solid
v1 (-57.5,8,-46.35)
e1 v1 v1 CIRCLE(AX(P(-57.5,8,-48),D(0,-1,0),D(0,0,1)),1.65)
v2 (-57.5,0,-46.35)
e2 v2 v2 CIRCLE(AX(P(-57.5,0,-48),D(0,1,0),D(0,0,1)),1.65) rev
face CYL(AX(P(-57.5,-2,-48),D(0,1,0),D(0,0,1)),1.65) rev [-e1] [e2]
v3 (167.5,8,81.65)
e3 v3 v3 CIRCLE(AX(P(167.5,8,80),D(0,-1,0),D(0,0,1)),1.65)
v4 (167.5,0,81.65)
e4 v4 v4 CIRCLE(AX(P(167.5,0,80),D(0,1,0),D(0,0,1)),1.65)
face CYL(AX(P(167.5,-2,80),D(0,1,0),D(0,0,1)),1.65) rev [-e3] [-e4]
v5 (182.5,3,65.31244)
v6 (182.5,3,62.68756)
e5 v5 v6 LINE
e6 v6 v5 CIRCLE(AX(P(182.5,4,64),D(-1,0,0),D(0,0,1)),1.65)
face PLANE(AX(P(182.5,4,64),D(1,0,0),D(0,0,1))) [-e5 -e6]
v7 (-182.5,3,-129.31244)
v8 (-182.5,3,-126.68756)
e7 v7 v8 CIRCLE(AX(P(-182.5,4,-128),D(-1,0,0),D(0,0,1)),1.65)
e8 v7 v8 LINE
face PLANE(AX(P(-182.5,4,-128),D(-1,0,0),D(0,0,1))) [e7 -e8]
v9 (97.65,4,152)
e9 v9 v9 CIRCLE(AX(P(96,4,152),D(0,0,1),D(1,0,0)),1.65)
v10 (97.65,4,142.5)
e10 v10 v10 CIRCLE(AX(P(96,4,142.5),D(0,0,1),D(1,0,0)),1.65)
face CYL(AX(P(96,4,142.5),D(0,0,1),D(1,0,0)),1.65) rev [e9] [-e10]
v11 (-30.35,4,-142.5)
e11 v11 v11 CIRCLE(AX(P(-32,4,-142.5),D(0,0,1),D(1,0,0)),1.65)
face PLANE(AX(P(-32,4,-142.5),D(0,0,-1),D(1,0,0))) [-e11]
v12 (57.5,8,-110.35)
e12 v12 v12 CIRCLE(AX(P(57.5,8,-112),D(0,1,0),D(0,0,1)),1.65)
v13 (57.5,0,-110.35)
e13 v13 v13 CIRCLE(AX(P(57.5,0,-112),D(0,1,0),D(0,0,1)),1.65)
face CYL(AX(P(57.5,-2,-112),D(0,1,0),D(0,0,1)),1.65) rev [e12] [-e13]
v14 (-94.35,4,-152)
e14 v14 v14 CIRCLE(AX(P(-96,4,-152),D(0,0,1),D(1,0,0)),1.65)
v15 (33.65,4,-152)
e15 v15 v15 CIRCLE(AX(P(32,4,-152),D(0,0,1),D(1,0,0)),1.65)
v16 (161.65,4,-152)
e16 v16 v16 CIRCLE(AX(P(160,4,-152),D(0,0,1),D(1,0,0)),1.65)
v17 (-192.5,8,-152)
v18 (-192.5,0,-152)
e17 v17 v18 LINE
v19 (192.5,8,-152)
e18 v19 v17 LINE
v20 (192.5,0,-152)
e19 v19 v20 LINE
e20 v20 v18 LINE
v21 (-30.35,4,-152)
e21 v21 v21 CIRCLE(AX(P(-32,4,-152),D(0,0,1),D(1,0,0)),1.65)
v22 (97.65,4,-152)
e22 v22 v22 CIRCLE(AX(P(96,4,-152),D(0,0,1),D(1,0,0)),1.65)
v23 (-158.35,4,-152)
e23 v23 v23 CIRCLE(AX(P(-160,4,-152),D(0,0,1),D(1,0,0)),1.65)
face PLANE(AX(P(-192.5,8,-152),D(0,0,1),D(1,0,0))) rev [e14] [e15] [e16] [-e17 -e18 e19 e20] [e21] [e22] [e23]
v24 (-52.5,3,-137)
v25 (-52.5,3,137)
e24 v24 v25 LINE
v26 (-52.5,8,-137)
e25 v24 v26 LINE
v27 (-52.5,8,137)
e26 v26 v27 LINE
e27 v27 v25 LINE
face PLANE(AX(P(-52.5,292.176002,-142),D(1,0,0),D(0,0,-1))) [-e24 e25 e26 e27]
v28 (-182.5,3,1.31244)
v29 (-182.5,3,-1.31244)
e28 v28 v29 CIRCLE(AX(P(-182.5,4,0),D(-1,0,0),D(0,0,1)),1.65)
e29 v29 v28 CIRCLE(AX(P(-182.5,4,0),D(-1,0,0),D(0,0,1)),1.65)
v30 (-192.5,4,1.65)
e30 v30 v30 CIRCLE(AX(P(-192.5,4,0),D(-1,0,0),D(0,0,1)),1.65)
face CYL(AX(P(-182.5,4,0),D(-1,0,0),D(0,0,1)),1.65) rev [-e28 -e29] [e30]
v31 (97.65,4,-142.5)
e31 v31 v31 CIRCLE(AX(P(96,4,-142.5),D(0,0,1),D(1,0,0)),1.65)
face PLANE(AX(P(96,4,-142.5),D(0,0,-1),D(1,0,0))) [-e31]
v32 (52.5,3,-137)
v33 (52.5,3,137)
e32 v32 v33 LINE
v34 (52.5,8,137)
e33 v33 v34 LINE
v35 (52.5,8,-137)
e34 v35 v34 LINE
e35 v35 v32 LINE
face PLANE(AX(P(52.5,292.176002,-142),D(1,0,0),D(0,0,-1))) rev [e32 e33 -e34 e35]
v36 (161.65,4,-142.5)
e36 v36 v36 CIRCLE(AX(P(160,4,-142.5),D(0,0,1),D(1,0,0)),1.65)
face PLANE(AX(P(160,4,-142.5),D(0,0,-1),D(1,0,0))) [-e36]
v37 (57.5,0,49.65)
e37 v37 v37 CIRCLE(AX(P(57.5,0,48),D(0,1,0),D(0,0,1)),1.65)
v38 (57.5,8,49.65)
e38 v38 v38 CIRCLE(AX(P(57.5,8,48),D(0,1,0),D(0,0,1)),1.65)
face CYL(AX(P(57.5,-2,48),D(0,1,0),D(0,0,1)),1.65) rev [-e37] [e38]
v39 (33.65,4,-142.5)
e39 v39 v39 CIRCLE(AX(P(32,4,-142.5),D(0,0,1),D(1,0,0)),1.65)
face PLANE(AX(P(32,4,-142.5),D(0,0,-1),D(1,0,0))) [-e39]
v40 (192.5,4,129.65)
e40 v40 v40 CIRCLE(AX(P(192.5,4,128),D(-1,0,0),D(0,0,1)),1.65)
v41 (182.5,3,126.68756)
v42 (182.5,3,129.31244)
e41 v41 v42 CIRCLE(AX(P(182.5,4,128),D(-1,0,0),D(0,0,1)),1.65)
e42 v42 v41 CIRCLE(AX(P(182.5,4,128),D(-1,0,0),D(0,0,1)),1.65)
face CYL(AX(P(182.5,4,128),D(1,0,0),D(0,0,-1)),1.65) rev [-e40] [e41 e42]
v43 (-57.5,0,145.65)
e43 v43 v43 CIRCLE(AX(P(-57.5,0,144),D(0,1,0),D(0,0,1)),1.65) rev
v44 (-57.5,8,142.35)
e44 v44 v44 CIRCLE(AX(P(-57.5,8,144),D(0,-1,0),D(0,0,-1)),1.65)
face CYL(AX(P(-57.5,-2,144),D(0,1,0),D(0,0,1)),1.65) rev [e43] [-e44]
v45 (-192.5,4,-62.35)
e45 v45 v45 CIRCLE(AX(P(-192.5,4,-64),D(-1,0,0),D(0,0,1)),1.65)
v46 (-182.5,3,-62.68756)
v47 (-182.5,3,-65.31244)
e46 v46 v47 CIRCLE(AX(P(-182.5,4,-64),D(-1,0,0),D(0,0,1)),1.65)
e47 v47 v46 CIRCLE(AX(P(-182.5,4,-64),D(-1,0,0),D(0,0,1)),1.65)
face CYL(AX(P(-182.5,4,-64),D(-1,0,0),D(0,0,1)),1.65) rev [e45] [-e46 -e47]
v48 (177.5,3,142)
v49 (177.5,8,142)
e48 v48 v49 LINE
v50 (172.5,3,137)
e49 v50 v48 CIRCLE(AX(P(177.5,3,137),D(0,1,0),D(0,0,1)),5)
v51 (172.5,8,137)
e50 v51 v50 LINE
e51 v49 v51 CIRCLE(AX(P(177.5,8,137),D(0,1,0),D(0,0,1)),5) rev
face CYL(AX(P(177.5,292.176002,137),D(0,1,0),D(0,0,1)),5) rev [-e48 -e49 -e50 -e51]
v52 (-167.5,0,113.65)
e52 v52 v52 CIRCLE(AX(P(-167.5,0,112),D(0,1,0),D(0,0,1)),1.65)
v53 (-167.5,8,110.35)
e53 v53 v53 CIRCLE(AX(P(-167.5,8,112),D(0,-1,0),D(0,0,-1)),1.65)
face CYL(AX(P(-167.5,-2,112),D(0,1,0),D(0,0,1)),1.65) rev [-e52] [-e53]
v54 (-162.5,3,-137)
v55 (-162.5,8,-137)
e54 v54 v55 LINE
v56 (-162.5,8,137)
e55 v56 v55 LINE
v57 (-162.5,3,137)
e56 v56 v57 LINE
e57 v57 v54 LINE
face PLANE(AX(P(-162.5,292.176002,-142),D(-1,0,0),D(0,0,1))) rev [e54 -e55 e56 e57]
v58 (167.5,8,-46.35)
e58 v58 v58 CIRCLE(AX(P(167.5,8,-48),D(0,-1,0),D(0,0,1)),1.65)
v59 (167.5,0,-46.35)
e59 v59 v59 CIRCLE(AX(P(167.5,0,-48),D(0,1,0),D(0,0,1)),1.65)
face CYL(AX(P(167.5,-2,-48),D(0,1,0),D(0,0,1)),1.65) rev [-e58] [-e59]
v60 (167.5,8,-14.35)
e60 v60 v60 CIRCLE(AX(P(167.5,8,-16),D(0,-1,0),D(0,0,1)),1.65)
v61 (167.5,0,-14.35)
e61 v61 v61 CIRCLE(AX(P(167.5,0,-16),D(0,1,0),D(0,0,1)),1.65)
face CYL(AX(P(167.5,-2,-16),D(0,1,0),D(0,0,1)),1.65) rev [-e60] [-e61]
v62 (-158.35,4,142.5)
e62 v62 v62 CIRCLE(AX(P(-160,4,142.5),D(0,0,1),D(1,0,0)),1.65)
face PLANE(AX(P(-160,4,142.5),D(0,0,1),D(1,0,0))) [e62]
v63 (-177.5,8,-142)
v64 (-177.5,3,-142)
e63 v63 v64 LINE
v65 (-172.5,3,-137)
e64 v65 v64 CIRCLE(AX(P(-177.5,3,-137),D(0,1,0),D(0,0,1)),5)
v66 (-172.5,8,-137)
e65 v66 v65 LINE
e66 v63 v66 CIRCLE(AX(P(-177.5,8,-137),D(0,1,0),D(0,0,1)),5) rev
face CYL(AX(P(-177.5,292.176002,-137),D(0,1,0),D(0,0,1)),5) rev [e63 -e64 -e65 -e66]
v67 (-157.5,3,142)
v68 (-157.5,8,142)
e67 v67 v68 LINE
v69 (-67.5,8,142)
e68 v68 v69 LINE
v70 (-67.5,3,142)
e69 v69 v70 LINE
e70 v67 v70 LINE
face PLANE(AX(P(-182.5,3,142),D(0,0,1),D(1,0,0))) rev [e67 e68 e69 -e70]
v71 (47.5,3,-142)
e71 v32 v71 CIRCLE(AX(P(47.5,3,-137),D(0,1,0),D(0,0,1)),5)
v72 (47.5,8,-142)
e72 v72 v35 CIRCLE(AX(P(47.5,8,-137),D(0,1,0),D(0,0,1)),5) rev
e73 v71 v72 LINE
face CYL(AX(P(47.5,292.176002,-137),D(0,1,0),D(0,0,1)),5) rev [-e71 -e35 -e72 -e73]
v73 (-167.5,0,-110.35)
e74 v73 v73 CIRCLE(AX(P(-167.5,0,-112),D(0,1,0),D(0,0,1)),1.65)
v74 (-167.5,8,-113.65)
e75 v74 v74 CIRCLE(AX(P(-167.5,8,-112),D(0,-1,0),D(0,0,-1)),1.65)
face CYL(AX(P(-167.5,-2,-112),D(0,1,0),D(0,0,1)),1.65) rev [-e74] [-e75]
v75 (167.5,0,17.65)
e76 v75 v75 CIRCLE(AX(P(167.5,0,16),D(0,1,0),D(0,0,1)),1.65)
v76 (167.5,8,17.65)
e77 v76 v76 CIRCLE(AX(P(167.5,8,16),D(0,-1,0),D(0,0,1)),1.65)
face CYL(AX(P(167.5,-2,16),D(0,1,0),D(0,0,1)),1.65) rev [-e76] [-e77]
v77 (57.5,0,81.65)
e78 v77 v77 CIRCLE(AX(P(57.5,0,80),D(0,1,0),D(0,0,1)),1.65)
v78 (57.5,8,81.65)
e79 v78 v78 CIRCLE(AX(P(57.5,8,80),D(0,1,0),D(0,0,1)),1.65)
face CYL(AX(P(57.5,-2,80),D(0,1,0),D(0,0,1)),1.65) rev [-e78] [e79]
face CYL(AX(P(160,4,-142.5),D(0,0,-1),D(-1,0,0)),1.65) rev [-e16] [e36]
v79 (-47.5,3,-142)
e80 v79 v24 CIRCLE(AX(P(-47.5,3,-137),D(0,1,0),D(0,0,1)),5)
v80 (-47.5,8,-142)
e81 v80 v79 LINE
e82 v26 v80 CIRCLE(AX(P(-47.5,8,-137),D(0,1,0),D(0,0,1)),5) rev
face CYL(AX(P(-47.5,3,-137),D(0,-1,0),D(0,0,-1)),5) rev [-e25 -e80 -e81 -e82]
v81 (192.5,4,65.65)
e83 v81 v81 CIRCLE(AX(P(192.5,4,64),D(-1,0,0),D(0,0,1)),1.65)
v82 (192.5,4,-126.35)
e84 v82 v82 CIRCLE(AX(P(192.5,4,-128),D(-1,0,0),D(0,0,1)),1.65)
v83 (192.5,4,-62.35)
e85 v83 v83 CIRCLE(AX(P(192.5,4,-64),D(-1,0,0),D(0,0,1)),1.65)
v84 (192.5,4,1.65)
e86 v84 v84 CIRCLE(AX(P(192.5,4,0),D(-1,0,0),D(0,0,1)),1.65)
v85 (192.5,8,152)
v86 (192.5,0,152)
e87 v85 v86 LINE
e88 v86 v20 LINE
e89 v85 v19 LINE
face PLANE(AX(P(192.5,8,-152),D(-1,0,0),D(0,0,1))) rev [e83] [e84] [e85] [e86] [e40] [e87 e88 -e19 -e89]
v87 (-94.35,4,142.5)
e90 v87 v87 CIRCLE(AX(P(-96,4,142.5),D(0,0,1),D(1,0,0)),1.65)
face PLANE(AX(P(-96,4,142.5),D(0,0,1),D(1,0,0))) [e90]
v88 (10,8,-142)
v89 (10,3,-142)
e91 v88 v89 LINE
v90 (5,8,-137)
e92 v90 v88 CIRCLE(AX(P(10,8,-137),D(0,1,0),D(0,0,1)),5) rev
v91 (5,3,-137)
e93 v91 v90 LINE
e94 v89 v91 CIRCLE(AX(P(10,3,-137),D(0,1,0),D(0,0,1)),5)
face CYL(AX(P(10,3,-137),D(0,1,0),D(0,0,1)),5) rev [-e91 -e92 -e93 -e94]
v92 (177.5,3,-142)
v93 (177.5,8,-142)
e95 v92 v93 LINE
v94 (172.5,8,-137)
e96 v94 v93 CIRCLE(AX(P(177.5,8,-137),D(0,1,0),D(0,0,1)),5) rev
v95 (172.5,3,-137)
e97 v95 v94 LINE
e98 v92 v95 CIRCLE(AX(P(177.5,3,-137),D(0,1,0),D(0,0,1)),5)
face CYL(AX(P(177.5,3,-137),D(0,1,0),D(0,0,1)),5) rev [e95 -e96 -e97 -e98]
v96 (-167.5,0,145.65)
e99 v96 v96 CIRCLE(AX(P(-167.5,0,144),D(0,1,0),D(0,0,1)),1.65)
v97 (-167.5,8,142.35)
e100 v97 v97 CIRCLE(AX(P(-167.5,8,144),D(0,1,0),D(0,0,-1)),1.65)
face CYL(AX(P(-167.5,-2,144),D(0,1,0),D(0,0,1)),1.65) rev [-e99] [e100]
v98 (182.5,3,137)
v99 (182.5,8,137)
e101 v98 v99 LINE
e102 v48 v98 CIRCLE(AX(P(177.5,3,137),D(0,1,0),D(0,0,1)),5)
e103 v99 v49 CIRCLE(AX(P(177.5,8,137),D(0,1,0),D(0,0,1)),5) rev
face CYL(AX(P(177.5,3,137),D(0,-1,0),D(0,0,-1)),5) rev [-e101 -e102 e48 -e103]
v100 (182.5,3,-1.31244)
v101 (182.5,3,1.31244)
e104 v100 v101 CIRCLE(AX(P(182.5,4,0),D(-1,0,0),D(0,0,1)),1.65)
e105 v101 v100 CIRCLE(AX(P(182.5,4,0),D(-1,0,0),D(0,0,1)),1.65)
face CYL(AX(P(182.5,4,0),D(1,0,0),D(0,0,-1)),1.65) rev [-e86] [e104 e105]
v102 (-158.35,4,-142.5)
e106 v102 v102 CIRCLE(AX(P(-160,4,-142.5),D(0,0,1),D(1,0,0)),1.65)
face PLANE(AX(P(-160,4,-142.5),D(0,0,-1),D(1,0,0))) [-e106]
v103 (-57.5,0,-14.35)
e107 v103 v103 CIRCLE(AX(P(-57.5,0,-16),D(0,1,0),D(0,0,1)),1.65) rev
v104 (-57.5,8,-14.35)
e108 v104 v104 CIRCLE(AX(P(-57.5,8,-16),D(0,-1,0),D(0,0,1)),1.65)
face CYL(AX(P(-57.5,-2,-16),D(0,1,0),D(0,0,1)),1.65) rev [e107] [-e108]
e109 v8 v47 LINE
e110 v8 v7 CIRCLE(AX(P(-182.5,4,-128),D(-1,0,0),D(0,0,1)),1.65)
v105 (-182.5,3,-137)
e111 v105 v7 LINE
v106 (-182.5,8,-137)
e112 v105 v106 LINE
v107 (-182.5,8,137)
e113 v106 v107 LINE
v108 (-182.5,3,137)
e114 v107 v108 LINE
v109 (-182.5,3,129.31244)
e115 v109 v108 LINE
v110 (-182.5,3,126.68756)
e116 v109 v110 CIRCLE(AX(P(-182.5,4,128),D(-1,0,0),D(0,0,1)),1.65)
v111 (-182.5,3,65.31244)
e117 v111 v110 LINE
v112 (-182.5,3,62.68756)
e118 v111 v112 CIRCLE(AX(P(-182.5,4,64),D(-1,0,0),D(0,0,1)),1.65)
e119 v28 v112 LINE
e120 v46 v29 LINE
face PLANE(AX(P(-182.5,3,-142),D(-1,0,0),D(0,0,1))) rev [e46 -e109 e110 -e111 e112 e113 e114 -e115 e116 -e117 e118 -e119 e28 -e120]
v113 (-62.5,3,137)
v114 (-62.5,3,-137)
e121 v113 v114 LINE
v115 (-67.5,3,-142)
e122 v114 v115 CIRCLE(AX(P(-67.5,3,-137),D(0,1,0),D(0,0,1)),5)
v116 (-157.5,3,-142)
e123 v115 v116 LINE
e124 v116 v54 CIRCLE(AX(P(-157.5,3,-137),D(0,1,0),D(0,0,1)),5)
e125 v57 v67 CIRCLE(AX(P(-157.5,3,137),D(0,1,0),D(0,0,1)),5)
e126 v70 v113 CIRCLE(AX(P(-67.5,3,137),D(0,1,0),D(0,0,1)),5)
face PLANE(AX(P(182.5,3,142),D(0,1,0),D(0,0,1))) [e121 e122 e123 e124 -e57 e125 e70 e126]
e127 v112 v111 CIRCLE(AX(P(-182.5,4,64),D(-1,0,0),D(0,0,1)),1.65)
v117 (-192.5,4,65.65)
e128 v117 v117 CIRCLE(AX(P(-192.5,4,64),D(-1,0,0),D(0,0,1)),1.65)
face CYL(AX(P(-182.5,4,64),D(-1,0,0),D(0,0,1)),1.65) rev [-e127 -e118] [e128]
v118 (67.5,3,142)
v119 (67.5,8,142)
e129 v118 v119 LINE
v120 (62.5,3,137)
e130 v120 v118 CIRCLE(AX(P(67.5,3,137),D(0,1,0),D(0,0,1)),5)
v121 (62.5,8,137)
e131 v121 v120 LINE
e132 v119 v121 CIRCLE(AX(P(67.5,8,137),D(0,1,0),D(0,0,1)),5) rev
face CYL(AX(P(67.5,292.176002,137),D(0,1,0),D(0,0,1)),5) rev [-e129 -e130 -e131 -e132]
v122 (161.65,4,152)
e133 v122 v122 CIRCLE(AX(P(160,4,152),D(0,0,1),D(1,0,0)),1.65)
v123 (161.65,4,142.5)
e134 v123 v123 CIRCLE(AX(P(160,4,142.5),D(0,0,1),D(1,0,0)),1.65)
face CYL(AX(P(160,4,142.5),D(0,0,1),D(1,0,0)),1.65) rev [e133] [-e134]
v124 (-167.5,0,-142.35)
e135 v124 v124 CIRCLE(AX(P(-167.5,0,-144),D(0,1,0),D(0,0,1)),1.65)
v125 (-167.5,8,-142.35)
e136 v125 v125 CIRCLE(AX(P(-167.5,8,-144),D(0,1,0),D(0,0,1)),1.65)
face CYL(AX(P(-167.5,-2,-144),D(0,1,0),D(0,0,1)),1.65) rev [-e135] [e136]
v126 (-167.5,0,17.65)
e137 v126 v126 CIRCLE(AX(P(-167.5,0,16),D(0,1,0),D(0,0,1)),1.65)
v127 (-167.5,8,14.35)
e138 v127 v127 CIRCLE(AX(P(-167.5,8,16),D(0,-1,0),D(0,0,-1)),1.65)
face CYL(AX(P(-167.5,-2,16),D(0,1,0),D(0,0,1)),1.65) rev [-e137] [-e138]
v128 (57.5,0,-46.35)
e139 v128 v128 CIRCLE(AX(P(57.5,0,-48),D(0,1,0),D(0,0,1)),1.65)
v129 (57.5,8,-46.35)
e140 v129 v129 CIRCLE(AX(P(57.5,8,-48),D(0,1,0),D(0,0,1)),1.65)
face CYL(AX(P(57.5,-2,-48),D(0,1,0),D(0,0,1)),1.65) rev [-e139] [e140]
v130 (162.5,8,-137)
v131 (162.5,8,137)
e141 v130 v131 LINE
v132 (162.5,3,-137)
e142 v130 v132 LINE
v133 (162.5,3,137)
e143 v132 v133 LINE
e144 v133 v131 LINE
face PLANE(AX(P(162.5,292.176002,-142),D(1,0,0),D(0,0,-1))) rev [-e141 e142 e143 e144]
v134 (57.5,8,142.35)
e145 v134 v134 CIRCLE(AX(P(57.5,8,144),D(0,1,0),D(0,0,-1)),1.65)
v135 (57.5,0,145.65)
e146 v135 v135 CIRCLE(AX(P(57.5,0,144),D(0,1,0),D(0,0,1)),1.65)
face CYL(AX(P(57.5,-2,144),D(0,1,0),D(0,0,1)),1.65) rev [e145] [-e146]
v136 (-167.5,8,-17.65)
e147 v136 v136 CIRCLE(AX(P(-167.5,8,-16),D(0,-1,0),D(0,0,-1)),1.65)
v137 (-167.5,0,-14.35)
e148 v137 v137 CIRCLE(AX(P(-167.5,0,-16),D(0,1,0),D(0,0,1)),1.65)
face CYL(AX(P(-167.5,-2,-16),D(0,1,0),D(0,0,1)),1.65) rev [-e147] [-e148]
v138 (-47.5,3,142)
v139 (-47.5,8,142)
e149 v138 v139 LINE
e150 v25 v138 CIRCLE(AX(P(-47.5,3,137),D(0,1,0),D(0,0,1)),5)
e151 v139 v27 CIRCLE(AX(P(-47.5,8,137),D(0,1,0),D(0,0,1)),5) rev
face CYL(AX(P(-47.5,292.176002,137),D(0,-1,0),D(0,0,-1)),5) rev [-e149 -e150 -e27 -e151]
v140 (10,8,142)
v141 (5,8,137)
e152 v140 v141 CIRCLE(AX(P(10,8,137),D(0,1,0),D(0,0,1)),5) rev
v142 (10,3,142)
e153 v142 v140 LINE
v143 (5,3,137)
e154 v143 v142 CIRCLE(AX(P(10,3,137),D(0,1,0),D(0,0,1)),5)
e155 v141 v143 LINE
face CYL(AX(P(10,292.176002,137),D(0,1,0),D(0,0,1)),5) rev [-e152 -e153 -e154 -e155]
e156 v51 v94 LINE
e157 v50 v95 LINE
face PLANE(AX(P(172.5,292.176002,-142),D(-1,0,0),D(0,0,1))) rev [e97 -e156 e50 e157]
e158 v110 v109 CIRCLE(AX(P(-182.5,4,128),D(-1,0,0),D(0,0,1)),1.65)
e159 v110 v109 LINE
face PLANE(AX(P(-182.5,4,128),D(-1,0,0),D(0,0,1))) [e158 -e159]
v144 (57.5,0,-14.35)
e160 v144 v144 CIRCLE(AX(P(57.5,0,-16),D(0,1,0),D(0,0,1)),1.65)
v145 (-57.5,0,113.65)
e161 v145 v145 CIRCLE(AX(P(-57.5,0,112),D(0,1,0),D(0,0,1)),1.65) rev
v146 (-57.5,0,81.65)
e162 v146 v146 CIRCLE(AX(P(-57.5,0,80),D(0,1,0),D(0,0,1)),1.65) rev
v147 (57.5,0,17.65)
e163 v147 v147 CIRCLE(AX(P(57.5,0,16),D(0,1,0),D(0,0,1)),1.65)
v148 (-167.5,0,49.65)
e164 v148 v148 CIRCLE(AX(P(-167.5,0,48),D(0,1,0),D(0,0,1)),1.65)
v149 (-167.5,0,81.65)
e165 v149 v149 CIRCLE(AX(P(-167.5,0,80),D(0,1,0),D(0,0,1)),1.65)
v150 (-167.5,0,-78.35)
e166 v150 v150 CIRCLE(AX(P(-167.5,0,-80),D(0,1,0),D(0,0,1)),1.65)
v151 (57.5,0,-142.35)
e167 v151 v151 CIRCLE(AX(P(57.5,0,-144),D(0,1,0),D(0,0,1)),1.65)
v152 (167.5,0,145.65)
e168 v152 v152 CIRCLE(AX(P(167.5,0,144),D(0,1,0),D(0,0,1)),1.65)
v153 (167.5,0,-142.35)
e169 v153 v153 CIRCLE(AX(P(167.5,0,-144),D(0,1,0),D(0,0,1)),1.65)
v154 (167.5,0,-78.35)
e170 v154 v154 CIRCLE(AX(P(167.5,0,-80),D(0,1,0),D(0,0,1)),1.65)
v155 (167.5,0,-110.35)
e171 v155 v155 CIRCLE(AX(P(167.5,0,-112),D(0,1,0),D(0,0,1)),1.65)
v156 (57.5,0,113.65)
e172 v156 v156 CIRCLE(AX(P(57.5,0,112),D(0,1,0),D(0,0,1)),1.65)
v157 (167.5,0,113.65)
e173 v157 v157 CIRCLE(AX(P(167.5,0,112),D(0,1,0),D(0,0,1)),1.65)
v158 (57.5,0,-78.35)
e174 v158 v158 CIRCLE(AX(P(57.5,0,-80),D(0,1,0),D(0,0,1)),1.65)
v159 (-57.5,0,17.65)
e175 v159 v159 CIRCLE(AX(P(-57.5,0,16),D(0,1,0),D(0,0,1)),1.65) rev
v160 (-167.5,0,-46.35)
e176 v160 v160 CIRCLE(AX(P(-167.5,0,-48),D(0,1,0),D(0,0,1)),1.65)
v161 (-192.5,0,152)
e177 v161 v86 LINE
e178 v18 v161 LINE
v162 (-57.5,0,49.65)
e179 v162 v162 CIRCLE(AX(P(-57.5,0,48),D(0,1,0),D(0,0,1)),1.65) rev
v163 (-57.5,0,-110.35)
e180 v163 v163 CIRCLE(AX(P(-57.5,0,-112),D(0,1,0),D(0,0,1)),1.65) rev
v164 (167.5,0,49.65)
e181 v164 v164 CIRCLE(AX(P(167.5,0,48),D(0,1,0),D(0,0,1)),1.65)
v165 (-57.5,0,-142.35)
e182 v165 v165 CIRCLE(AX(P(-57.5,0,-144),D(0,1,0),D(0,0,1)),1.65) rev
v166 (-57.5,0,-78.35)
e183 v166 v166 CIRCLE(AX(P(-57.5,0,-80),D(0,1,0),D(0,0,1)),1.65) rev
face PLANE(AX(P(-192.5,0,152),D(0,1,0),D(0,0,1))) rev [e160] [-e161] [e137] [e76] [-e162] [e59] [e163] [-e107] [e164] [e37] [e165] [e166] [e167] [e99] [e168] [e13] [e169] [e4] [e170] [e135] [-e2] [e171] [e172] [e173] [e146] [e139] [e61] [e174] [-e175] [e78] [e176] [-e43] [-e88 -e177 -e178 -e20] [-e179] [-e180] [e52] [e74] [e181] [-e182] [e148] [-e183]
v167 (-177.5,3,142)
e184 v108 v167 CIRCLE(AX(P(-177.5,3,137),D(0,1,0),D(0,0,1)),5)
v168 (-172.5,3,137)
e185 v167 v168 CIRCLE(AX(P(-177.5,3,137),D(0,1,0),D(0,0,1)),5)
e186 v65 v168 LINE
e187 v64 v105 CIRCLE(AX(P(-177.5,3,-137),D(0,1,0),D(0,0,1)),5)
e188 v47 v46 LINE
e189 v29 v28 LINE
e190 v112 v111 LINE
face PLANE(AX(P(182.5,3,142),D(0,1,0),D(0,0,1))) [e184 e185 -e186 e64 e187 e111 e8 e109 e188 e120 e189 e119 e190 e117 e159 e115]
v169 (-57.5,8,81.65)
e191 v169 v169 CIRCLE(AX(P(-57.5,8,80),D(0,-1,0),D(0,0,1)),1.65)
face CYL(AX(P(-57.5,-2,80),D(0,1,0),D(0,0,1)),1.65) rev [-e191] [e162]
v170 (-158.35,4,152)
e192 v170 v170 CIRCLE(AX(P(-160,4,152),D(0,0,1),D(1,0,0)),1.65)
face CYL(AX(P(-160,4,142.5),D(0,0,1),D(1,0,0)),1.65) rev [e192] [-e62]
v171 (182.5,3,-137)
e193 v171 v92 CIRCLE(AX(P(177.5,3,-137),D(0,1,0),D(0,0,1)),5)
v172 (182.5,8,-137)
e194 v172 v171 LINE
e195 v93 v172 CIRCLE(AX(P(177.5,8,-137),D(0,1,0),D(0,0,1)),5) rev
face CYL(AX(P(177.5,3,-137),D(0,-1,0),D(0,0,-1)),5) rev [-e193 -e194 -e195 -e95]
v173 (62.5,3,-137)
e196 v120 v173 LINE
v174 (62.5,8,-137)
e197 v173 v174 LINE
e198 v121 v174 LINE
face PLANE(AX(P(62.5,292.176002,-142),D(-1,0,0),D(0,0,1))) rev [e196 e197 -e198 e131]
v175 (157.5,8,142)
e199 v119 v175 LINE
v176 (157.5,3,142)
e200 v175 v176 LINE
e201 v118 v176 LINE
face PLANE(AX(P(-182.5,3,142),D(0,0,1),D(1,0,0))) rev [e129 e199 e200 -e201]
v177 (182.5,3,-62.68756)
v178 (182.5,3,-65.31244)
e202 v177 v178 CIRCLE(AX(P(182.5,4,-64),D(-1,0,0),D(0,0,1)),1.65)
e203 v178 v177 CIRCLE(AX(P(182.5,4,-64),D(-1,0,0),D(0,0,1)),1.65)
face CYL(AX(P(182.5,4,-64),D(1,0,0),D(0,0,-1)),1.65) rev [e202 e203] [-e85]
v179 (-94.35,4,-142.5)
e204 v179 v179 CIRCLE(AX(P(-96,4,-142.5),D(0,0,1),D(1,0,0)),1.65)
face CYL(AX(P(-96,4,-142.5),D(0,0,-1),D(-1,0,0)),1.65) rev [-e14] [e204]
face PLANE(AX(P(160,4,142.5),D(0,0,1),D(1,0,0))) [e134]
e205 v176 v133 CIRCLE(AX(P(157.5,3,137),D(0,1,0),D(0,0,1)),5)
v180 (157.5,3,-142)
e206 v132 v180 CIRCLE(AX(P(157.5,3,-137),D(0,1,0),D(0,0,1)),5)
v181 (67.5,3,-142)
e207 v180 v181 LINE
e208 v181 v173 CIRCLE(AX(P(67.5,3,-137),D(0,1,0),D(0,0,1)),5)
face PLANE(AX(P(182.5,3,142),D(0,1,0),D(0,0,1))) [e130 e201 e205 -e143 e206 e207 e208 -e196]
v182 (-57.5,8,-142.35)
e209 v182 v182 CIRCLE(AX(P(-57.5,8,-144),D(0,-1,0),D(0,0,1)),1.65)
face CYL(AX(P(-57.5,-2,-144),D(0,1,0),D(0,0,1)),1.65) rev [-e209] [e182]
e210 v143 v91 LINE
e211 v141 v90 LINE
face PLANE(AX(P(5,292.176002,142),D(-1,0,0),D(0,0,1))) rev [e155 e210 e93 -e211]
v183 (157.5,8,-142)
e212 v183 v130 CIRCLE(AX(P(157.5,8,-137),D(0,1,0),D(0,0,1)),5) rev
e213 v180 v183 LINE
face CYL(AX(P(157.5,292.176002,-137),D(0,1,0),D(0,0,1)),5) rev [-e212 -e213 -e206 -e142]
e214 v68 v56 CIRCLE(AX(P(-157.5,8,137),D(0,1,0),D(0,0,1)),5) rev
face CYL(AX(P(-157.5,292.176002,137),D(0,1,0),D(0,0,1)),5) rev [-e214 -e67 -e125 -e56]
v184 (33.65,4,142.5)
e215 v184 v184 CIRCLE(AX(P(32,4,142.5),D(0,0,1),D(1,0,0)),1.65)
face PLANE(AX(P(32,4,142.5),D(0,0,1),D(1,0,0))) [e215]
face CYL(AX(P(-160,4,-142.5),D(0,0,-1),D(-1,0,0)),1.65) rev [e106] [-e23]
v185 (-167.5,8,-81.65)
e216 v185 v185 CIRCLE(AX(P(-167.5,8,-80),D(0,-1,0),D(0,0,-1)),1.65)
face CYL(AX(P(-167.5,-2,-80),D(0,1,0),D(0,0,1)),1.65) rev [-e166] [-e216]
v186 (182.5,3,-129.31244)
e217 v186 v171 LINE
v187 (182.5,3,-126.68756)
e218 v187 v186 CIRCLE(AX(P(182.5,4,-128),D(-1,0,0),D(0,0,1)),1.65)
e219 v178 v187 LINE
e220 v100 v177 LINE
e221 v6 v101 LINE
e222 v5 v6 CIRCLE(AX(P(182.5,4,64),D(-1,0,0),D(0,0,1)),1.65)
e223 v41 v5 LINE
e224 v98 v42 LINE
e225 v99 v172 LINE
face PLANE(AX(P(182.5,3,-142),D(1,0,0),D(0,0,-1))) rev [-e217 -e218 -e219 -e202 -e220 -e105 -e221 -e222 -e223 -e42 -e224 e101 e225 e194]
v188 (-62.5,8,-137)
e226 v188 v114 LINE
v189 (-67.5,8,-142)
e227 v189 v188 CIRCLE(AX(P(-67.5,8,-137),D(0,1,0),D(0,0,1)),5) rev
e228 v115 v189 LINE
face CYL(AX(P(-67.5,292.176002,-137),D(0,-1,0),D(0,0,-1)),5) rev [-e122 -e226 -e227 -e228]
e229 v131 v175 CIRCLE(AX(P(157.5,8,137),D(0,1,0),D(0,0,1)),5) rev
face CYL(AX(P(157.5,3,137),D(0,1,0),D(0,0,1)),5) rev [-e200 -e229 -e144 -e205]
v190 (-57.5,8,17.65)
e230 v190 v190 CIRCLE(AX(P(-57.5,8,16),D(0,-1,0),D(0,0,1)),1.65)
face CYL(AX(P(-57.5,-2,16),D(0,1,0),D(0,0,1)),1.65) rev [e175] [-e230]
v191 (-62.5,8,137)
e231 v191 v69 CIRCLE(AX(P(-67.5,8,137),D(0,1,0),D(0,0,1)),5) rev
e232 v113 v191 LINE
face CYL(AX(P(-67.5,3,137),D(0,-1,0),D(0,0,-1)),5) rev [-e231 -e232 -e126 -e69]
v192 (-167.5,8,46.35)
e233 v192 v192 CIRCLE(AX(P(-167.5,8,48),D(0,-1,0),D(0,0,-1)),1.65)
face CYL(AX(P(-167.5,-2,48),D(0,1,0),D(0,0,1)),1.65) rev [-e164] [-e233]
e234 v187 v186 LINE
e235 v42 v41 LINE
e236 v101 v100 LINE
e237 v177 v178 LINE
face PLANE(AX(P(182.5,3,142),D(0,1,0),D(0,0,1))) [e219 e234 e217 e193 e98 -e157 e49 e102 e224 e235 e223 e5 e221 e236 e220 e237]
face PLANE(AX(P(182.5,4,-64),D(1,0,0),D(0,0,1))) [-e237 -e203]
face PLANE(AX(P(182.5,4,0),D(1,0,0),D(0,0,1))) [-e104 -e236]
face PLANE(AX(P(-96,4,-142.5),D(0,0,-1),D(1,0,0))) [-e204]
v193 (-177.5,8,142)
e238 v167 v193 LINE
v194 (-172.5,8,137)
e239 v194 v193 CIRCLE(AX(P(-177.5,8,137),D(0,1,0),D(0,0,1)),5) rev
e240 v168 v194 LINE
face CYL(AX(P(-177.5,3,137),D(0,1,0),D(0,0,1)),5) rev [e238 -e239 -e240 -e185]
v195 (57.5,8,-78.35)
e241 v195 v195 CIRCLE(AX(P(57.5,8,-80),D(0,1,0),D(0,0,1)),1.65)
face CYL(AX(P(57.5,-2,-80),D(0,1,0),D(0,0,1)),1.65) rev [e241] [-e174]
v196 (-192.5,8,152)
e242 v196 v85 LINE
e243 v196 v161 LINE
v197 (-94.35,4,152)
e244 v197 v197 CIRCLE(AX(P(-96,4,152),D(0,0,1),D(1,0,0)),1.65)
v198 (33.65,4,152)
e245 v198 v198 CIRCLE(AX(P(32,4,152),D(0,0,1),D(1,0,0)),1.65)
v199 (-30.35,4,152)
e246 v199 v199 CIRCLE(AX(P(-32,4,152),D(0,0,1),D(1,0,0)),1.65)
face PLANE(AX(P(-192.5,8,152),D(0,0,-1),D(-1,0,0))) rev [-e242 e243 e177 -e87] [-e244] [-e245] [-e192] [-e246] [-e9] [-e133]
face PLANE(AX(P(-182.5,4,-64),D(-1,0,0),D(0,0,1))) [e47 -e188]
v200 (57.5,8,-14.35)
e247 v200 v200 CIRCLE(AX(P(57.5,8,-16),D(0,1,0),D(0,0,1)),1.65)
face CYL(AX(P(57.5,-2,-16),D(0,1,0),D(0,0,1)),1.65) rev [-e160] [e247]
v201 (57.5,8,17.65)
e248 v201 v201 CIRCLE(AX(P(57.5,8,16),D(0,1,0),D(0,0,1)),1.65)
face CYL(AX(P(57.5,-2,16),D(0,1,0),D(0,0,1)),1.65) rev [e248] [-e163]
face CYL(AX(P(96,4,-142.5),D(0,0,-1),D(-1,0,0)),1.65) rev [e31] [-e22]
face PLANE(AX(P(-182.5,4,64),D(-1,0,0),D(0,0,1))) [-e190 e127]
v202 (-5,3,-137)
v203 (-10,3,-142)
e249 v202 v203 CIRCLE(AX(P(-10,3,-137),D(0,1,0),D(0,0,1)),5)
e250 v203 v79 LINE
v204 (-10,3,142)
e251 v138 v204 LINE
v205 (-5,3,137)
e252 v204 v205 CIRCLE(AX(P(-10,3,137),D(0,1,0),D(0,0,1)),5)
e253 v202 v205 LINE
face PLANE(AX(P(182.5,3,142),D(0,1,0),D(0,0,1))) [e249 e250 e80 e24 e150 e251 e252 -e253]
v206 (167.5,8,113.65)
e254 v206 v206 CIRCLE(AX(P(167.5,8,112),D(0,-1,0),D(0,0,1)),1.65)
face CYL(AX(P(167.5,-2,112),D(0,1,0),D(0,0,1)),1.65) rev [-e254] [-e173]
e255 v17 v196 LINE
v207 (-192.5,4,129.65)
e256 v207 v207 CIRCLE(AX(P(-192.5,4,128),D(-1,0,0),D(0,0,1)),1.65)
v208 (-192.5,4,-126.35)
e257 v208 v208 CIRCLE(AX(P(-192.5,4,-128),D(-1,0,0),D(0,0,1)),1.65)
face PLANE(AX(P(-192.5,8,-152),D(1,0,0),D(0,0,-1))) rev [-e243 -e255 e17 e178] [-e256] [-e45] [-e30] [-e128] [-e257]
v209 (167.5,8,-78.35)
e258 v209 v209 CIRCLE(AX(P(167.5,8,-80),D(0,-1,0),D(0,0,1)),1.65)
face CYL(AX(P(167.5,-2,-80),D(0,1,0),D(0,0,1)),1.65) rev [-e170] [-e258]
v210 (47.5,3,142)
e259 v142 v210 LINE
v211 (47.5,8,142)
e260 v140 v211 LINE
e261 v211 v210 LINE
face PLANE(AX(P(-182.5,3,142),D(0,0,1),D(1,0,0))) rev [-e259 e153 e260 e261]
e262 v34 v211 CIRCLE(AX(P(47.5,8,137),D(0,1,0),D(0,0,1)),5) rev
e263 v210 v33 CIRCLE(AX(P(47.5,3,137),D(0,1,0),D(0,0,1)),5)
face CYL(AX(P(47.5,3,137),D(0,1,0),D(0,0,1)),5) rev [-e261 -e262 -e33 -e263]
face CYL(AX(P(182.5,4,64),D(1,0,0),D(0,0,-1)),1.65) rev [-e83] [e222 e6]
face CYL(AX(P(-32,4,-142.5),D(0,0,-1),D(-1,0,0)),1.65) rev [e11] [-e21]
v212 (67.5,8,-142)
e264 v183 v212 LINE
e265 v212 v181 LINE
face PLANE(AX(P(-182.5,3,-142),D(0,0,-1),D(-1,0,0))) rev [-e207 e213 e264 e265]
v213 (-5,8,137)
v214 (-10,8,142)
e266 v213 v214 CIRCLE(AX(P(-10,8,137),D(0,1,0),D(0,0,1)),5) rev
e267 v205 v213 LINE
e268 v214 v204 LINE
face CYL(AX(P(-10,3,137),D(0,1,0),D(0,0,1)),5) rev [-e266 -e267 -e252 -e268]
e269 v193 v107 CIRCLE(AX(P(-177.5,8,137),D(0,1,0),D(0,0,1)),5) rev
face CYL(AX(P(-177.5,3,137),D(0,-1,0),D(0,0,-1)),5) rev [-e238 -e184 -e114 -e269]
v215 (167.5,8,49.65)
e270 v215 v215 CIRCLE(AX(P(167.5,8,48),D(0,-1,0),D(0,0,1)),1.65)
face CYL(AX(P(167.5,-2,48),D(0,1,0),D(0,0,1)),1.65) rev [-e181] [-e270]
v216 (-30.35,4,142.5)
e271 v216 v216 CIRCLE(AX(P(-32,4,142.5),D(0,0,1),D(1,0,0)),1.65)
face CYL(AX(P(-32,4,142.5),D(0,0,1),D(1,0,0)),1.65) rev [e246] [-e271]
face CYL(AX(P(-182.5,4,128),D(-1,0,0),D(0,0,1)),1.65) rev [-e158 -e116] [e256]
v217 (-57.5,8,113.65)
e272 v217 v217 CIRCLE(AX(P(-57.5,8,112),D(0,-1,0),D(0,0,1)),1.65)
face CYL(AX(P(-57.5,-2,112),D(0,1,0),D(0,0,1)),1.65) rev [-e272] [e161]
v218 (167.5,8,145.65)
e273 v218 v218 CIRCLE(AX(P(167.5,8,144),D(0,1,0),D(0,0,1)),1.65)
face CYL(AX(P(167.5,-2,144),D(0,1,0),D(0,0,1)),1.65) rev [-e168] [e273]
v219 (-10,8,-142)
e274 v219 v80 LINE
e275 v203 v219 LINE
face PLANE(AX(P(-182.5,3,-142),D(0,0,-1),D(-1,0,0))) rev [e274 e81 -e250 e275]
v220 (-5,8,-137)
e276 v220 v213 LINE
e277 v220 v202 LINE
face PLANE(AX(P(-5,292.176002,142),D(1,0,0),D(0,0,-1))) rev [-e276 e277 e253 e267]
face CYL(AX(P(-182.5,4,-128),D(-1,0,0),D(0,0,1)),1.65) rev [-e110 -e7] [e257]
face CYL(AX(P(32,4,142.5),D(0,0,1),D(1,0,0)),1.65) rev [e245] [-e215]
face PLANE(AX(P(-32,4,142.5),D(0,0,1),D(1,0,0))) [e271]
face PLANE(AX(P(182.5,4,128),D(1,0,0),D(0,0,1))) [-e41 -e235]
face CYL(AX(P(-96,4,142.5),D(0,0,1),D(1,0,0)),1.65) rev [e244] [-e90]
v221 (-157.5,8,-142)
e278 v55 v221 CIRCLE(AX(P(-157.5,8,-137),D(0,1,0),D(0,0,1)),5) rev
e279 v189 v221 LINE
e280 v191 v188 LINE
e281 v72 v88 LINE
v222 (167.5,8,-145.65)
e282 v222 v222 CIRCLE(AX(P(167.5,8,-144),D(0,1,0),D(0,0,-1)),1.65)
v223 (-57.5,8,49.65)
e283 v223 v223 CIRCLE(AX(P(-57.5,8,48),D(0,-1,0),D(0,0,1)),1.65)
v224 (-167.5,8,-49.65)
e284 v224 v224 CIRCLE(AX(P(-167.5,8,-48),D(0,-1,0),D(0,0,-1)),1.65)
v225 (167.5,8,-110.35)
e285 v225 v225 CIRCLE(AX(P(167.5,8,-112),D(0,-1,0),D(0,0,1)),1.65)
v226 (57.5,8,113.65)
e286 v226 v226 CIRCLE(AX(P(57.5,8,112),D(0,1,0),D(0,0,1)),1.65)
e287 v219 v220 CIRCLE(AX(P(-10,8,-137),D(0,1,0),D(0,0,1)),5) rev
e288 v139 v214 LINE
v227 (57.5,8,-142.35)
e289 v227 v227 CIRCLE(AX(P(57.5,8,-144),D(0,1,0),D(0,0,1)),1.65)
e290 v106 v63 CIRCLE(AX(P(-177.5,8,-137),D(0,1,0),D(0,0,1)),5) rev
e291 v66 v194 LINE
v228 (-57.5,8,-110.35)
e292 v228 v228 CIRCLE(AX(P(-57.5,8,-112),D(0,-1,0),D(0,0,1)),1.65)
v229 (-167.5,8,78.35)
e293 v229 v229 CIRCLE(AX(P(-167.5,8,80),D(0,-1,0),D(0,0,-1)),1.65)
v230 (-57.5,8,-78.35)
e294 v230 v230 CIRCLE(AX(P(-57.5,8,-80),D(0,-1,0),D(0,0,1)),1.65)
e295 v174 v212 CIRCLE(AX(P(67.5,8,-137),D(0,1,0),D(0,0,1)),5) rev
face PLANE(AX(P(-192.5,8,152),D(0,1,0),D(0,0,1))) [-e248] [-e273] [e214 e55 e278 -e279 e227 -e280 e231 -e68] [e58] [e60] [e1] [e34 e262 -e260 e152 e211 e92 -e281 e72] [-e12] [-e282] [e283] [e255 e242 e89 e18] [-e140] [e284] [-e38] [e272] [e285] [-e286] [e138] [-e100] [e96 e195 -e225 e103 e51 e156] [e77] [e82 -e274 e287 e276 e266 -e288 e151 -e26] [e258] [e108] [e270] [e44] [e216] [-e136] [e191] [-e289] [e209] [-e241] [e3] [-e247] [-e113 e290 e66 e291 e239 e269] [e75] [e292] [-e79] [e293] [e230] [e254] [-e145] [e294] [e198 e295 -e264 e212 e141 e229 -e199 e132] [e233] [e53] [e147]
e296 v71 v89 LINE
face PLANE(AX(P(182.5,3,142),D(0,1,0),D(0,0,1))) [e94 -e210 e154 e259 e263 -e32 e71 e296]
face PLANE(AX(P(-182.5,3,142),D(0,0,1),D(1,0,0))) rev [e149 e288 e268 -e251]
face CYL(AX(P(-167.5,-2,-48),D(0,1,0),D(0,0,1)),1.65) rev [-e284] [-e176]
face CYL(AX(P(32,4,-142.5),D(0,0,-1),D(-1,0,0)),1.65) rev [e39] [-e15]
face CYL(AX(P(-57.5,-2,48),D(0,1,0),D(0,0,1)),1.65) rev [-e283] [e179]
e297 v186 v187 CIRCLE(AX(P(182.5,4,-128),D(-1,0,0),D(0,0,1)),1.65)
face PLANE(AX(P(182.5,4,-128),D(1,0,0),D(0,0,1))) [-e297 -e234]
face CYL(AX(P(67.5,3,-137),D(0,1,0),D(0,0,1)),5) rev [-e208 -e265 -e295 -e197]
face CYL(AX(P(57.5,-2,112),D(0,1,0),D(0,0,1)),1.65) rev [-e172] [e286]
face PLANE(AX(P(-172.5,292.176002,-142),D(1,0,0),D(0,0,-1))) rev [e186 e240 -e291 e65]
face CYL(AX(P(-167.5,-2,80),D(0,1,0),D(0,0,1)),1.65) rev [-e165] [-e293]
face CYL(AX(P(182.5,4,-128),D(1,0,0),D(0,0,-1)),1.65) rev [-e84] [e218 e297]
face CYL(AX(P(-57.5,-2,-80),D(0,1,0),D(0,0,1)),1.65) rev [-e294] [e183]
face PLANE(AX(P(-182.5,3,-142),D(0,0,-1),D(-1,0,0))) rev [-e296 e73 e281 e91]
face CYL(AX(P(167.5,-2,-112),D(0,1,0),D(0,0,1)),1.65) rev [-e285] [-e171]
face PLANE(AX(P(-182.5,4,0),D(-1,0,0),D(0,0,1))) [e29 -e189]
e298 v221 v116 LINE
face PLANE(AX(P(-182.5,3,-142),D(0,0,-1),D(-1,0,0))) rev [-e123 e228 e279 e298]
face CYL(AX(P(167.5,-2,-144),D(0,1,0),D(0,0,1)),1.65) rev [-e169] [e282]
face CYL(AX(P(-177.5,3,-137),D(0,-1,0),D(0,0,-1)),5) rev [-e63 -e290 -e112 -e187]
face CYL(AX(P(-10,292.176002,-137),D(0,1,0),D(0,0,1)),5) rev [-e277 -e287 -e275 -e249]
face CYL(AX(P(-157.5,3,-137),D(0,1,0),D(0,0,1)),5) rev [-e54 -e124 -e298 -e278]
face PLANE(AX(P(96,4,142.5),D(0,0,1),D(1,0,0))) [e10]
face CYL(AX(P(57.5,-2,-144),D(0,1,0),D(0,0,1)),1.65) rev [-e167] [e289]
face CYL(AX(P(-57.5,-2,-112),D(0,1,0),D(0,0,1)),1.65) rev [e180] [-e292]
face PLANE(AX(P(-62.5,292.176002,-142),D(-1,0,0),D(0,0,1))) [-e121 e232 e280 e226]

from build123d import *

# Parameters (mm, degrees)
SKETCH1_W           = 385
SKETCH1_H           = 304
EXTRUDE1_DEPTH      = 8
SKETCH2_R           = 1.65
CUT_EXTRUDE1_DEPTH  = 9.5
SKETCH3_R           = 1.65
CUT_EXTRUDE2_DEPTH  = 10
SKETCH4_W           = 365
SKETCH4_H           = 284
CUT_EXTRUDE3_DEPTH  = 5
SKETCH5_W           = 10
SKETCH5_H           = 284
BOSS_EXTRUDE1_DEPTH = 5
SKETCH6_W           = 10
SKETCH6_H           = 284
BOSS_EXTRUDE2_DEPTH = 5
SKETCH7_R           = 1.65
CUT_EXTRUDE4_DEPTH  = 10
MIRROR3_OUTLINE_R   = 1.65
MIRROR3_DEPTH       = 8
MIRROR3_START       = 3
MIRROR3_2_OUTLINE_W = 10
MIRROR3_2_OUTLINE_H = 284
MIRROR3_2_OUTLINE_R = 1.65
MIRROR3_2_DEPTH     = 5
FILLET1_R           = 5


# Read off the part's stored shape, not the designer's step: Mirror3
with BuildPart() as part:
    # Sketch1 → Extrude1 (new body)
    with BuildSketch(Plane(origin=(0, 0, 0), x_dir=(1, 0, 0), z_dir=(0, 1, 0))):
        Rectangle(SKETCH1_W, SKETCH1_H)
    extrude(amount=EXTRUDE1_DEPTH)

    # Sketch2 → Cut-Extrude1 (cut)
    with BuildSketch(Plane.XY.offset(152)):
        with Locations((-160, 4)):
            Circle(SKETCH2_R)
        with Locations((-96, 4)):
            Circle(SKETCH2_R)
        with Locations((-32, 4)):
            Circle(SKETCH2_R)
        with Locations((32, 4)):
            Circle(SKETCH2_R)
        with Locations((96, 4)):
            Circle(SKETCH2_R)
        with Locations((160, 4)):
            Circle(SKETCH2_R)
    cut_extrude1 = extrude(amount=-CUT_EXTRUDE1_DEPTH, mode=Mode.SUBTRACT)

    # Mirror1: Cut-Extrude1 across plane
    add(cut_extrude1.mirror(Plane.XY), mode=Mode.SUBTRACT)

    # Sketch3 → Cut-Extrude2 (cut)
    with BuildSketch(Plane.ZY.offset(192.5)):
        with Locations((-128, 4)):
            Circle(SKETCH3_R)
        with Locations((-64, 4)):
            Circle(SKETCH3_R)
        with Locations((0, 4)):
            Circle(SKETCH3_R)
        with Locations((64, 4)):
            Circle(SKETCH3_R)
        with Locations((128, 4)):
            Circle(SKETCH3_R)
    cut_extrude2 = extrude(amount=-CUT_EXTRUDE2_DEPTH, mode=Mode.SUBTRACT)

    # Mirror2: Cut-Extrude2 across plane
    add(cut_extrude2.mirror(Plane(origin=(0, 0, 0), x_dir=(0, 0, 1), z_dir=(1, 0, 0))), mode=Mode.SUBTRACT)

    # Sketch4 → Cut-Extrude3 (cut)
    with BuildSketch(Plane(origin=(0, 8, 0), x_dir=(-1, 0, 0), z_dir=(0, 1, 0))):
        Rectangle(SKETCH4_W, SKETCH4_H)
    extrude(amount=-CUT_EXTRUDE3_DEPTH, mode=Mode.SUBTRACT)

    # Sketch5 → Boss-Extrude1 (add)
    with BuildSketch(Plane(origin=(0, 3, 0), x_dir=(1, 0, 0), z_dir=(0, 1, 0))):
        with Locations((-167.5, 0)):
            Rectangle(SKETCH5_W, SKETCH5_H)
        with Locations((167.5, 0)):
            Rectangle(SKETCH5_W, SKETCH5_H)
    boss_extrude1 = extrude(amount=BOSS_EXTRUDE1_DEPTH)

    # Sketch6 → Boss-Extrude2 (add)
    with BuildSketch(Plane(origin=(0, 3, 0), x_dir=(1, 0, 0), z_dir=(0, 1, 0))):
        Rectangle(SKETCH6_W, SKETCH6_H)
    extrude(amount=BOSS_EXTRUDE2_DEPTH)

    # Sketch7 → Cut-Extrude4 (cut)
    with BuildSketch(Plane(origin=(0, 8, 0), x_dir=(1, 0, 0), z_dir=(0, 1, 0))):
        with Locations(Location((-167.5, -112, 0), (0, 0, 270))):
            Circle(SKETCH7_R)
        with Locations(Location((-167.5, -80, 0), (0, 0, 270))):
            Circle(SKETCH7_R)
        with Locations(Location((-167.5, -48, 0), (0, 0, 270))):
            Circle(SKETCH7_R)
        with Locations(Location((-167.5, -16, 0), (0, 0, 270))):
            Circle(SKETCH7_R)
        with Locations(Location((-167.5, 16, 0), (0, 0, 270))):
            Circle(SKETCH7_R)
        with Locations(Location((-167.5, 48, 0), (0, 0, 270))):
            Circle(SKETCH7_R)
        with Locations(Location((-167.5, 80, 0), (0, 0, 270))):
            Circle(SKETCH7_R)
        with Locations(Location((-167.5, 112, 0), (0, 0, 270))):
            Circle(SKETCH7_R)
        with Locations(Location((167.5, 112, 0), (0, 0, 270))):
            Circle(SKETCH7_R)
        with Locations(Location((167.5, 80, 0), (0, 0, 270))):
            Circle(SKETCH7_R)
        with Locations(Location((167.5, 48, 0), (0, 0, 270))):
            Circle(SKETCH7_R)
        with Locations(Location((167.5, 16, 0), (0, 0, 270))):
            Circle(SKETCH7_R)
        with Locations(Location((167.5, -16, 0), (0, 0, 270))):
            Circle(SKETCH7_R)
        with Locations(Location((167.5, -48, 0), (0, 0, 270))):
            Circle(SKETCH7_R)
        with Locations(Location((167.5, -80, 0), (0, 0, 270))):
            Circle(SKETCH7_R)
        with Locations(Location((167.5, -112, 0), (0, 0, 270))):
            Circle(SKETCH7_R)
        with Locations(Location((-167.5, 144, 0), (0, 0, 270))):
            Circle(SKETCH7_R)
        with Locations(Location((-167.5, -144, 0), (0, 0, 270))):
            Circle(SKETCH7_R)
        with Locations(Location((167.5, -144, 0), (0, 0, 270))):
            Circle(SKETCH7_R)
        with Locations(Location((167.5, 144, 0), (0, 0, 270))):
            Circle(SKETCH7_R)
    cut_extrude4 = extrude(amount=-CUT_EXTRUDE4_DEPTH, mode=Mode.SUBTRACT)

    # Mirror3 outline → Mirror3 (cut)
    with BuildSketch(Plane(origin=(0, 0, 0), x_dir=(1, 0, 0), z_dir=(0, 1, 0))):
        with Locations((-57.5, -112)):
            Circle(MIRROR3_OUTLINE_R)
        with Locations((-57.5, -80)):
            Circle(MIRROR3_OUTLINE_R)
        with Locations((-57.5, -48)):
            Circle(MIRROR3_OUTLINE_R)
        with Locations((-57.5, -16)):
            Circle(MIRROR3_OUTLINE_R)
        with Locations((-57.5, 16)):
            Circle(MIRROR3_OUTLINE_R)
        with Locations((-57.5, 48)):
            Circle(MIRROR3_OUTLINE_R)
        with Locations((-57.5, 80)):
            Circle(MIRROR3_OUTLINE_R)
        with Locations((-57.5, 112)):
            Circle(MIRROR3_OUTLINE_R)
        with Locations((-57.5, 144)):
            Circle(MIRROR3_OUTLINE_R)
        with Locations((-57.5, -144)):
            Circle(MIRROR3_OUTLINE_R)
    mirror3 = extrude(amount=MIRROR3_DEPTH, mode=Mode.SUBTRACT)

    # Mirror3 2 outline → Mirror3 2 (add)
    with BuildSketch(Plane(origin=(0, 0, 0), x_dir=(1, 0, 0), z_dir=(0, 1, 0)).offset(MIRROR3_START)):
        with Locations((-57.5, 0)):
            Rectangle(MIRROR3_2_OUTLINE_W, MIRROR3_2_OUTLINE_H)
        with Locations((-57.5, -112)):
            Circle(MIRROR3_2_OUTLINE_R, mode=Mode.SUBTRACT)
        with Locations((-57.5, -80)):
            Circle(MIRROR3_2_OUTLINE_R, mode=Mode.SUBTRACT)
        with Locations((-57.5, -48)):
            Circle(MIRROR3_2_OUTLINE_R, mode=Mode.SUBTRACT)
        with Locations((-57.5, -16)):
            Circle(MIRROR3_2_OUTLINE_R, mode=Mode.SUBTRACT)
        with Locations((-57.5, 16)):
            Circle(MIRROR3_2_OUTLINE_R, mode=Mode.SUBTRACT)
        with Locations((-57.5, 48)):
            Circle(MIRROR3_2_OUTLINE_R, mode=Mode.SUBTRACT)
        with Locations((-57.5, 80)):
            Circle(MIRROR3_2_OUTLINE_R, mode=Mode.SUBTRACT)
        with Locations((-57.5, 112)):
            Circle(MIRROR3_2_OUTLINE_R, mode=Mode.SUBTRACT)
    mirror3_2 = extrude(amount=MIRROR3_2_DEPTH)

    # Mirror4: Boss-Extrude1, Cut-Extrude4, Mirror3, Mirror3 2 across plane
    add(boss_extrude1.mirror(Plane(origin=(0, 0, 0), x_dir=(0, 0, 1), z_dir=(1, 0, 0))))
    add(cut_extrude4.mirror(Plane(origin=(0, 0, 0), x_dir=(0, 0, 1), z_dir=(1, 0, 0))), mode=Mode.SUBTRACT)
    add(mirror3.mirror(Plane(origin=(0, 0, 0), x_dir=(0, 0, 1), z_dir=(1, 0, 0))), mode=Mode.SUBTRACT)
    add(mirror3_2.mirror(Plane(origin=(0, 0, 0), x_dir=(0, 0, 1), z_dir=(1, 0, 0))))

    # Fillet1
    fillet1_edges = [part.edges().sort_by_distance(p)[0] for p in [
        (182.5, 5.5, -142),
        (182.5, 5.5, 142),
        (-182.5, 5.5, 142),
        (-182.5, 5.5, -142),
        (-172.5, 5.5, -142),
        (-172.5, 5.5, 142),
        (-162.5, 5.5, 142),
        (-162.5, 5.5, -142),
        (172.5, 5.5, -142),
        (162.5, 5.5, -142),
        (162.5, 5.5, 142),
        (172.5, 5.5, 142),
        (-5, 5.5, -142),
        (-5, 5.5, 142),
        (5, 5.5, 142),
        (5, 5.5, -142),
        (-62.5, 5.5, 142),
        (-62.5, 5.5, -142),
        (-52.5, 5.5, -142),
        (-52.5, 5.5, 142),
        (52.5, 5.5, -142),
        (52.5, 5.5, 142),
        (62.5, 5.5, 142),
        (62.5, 5.5, -142),
    ]]
    fillet(fillet1_edges, radius=FILLET1_R - 0.0001)  # a hair under: the kernel refuses the full size


solid = part.part
